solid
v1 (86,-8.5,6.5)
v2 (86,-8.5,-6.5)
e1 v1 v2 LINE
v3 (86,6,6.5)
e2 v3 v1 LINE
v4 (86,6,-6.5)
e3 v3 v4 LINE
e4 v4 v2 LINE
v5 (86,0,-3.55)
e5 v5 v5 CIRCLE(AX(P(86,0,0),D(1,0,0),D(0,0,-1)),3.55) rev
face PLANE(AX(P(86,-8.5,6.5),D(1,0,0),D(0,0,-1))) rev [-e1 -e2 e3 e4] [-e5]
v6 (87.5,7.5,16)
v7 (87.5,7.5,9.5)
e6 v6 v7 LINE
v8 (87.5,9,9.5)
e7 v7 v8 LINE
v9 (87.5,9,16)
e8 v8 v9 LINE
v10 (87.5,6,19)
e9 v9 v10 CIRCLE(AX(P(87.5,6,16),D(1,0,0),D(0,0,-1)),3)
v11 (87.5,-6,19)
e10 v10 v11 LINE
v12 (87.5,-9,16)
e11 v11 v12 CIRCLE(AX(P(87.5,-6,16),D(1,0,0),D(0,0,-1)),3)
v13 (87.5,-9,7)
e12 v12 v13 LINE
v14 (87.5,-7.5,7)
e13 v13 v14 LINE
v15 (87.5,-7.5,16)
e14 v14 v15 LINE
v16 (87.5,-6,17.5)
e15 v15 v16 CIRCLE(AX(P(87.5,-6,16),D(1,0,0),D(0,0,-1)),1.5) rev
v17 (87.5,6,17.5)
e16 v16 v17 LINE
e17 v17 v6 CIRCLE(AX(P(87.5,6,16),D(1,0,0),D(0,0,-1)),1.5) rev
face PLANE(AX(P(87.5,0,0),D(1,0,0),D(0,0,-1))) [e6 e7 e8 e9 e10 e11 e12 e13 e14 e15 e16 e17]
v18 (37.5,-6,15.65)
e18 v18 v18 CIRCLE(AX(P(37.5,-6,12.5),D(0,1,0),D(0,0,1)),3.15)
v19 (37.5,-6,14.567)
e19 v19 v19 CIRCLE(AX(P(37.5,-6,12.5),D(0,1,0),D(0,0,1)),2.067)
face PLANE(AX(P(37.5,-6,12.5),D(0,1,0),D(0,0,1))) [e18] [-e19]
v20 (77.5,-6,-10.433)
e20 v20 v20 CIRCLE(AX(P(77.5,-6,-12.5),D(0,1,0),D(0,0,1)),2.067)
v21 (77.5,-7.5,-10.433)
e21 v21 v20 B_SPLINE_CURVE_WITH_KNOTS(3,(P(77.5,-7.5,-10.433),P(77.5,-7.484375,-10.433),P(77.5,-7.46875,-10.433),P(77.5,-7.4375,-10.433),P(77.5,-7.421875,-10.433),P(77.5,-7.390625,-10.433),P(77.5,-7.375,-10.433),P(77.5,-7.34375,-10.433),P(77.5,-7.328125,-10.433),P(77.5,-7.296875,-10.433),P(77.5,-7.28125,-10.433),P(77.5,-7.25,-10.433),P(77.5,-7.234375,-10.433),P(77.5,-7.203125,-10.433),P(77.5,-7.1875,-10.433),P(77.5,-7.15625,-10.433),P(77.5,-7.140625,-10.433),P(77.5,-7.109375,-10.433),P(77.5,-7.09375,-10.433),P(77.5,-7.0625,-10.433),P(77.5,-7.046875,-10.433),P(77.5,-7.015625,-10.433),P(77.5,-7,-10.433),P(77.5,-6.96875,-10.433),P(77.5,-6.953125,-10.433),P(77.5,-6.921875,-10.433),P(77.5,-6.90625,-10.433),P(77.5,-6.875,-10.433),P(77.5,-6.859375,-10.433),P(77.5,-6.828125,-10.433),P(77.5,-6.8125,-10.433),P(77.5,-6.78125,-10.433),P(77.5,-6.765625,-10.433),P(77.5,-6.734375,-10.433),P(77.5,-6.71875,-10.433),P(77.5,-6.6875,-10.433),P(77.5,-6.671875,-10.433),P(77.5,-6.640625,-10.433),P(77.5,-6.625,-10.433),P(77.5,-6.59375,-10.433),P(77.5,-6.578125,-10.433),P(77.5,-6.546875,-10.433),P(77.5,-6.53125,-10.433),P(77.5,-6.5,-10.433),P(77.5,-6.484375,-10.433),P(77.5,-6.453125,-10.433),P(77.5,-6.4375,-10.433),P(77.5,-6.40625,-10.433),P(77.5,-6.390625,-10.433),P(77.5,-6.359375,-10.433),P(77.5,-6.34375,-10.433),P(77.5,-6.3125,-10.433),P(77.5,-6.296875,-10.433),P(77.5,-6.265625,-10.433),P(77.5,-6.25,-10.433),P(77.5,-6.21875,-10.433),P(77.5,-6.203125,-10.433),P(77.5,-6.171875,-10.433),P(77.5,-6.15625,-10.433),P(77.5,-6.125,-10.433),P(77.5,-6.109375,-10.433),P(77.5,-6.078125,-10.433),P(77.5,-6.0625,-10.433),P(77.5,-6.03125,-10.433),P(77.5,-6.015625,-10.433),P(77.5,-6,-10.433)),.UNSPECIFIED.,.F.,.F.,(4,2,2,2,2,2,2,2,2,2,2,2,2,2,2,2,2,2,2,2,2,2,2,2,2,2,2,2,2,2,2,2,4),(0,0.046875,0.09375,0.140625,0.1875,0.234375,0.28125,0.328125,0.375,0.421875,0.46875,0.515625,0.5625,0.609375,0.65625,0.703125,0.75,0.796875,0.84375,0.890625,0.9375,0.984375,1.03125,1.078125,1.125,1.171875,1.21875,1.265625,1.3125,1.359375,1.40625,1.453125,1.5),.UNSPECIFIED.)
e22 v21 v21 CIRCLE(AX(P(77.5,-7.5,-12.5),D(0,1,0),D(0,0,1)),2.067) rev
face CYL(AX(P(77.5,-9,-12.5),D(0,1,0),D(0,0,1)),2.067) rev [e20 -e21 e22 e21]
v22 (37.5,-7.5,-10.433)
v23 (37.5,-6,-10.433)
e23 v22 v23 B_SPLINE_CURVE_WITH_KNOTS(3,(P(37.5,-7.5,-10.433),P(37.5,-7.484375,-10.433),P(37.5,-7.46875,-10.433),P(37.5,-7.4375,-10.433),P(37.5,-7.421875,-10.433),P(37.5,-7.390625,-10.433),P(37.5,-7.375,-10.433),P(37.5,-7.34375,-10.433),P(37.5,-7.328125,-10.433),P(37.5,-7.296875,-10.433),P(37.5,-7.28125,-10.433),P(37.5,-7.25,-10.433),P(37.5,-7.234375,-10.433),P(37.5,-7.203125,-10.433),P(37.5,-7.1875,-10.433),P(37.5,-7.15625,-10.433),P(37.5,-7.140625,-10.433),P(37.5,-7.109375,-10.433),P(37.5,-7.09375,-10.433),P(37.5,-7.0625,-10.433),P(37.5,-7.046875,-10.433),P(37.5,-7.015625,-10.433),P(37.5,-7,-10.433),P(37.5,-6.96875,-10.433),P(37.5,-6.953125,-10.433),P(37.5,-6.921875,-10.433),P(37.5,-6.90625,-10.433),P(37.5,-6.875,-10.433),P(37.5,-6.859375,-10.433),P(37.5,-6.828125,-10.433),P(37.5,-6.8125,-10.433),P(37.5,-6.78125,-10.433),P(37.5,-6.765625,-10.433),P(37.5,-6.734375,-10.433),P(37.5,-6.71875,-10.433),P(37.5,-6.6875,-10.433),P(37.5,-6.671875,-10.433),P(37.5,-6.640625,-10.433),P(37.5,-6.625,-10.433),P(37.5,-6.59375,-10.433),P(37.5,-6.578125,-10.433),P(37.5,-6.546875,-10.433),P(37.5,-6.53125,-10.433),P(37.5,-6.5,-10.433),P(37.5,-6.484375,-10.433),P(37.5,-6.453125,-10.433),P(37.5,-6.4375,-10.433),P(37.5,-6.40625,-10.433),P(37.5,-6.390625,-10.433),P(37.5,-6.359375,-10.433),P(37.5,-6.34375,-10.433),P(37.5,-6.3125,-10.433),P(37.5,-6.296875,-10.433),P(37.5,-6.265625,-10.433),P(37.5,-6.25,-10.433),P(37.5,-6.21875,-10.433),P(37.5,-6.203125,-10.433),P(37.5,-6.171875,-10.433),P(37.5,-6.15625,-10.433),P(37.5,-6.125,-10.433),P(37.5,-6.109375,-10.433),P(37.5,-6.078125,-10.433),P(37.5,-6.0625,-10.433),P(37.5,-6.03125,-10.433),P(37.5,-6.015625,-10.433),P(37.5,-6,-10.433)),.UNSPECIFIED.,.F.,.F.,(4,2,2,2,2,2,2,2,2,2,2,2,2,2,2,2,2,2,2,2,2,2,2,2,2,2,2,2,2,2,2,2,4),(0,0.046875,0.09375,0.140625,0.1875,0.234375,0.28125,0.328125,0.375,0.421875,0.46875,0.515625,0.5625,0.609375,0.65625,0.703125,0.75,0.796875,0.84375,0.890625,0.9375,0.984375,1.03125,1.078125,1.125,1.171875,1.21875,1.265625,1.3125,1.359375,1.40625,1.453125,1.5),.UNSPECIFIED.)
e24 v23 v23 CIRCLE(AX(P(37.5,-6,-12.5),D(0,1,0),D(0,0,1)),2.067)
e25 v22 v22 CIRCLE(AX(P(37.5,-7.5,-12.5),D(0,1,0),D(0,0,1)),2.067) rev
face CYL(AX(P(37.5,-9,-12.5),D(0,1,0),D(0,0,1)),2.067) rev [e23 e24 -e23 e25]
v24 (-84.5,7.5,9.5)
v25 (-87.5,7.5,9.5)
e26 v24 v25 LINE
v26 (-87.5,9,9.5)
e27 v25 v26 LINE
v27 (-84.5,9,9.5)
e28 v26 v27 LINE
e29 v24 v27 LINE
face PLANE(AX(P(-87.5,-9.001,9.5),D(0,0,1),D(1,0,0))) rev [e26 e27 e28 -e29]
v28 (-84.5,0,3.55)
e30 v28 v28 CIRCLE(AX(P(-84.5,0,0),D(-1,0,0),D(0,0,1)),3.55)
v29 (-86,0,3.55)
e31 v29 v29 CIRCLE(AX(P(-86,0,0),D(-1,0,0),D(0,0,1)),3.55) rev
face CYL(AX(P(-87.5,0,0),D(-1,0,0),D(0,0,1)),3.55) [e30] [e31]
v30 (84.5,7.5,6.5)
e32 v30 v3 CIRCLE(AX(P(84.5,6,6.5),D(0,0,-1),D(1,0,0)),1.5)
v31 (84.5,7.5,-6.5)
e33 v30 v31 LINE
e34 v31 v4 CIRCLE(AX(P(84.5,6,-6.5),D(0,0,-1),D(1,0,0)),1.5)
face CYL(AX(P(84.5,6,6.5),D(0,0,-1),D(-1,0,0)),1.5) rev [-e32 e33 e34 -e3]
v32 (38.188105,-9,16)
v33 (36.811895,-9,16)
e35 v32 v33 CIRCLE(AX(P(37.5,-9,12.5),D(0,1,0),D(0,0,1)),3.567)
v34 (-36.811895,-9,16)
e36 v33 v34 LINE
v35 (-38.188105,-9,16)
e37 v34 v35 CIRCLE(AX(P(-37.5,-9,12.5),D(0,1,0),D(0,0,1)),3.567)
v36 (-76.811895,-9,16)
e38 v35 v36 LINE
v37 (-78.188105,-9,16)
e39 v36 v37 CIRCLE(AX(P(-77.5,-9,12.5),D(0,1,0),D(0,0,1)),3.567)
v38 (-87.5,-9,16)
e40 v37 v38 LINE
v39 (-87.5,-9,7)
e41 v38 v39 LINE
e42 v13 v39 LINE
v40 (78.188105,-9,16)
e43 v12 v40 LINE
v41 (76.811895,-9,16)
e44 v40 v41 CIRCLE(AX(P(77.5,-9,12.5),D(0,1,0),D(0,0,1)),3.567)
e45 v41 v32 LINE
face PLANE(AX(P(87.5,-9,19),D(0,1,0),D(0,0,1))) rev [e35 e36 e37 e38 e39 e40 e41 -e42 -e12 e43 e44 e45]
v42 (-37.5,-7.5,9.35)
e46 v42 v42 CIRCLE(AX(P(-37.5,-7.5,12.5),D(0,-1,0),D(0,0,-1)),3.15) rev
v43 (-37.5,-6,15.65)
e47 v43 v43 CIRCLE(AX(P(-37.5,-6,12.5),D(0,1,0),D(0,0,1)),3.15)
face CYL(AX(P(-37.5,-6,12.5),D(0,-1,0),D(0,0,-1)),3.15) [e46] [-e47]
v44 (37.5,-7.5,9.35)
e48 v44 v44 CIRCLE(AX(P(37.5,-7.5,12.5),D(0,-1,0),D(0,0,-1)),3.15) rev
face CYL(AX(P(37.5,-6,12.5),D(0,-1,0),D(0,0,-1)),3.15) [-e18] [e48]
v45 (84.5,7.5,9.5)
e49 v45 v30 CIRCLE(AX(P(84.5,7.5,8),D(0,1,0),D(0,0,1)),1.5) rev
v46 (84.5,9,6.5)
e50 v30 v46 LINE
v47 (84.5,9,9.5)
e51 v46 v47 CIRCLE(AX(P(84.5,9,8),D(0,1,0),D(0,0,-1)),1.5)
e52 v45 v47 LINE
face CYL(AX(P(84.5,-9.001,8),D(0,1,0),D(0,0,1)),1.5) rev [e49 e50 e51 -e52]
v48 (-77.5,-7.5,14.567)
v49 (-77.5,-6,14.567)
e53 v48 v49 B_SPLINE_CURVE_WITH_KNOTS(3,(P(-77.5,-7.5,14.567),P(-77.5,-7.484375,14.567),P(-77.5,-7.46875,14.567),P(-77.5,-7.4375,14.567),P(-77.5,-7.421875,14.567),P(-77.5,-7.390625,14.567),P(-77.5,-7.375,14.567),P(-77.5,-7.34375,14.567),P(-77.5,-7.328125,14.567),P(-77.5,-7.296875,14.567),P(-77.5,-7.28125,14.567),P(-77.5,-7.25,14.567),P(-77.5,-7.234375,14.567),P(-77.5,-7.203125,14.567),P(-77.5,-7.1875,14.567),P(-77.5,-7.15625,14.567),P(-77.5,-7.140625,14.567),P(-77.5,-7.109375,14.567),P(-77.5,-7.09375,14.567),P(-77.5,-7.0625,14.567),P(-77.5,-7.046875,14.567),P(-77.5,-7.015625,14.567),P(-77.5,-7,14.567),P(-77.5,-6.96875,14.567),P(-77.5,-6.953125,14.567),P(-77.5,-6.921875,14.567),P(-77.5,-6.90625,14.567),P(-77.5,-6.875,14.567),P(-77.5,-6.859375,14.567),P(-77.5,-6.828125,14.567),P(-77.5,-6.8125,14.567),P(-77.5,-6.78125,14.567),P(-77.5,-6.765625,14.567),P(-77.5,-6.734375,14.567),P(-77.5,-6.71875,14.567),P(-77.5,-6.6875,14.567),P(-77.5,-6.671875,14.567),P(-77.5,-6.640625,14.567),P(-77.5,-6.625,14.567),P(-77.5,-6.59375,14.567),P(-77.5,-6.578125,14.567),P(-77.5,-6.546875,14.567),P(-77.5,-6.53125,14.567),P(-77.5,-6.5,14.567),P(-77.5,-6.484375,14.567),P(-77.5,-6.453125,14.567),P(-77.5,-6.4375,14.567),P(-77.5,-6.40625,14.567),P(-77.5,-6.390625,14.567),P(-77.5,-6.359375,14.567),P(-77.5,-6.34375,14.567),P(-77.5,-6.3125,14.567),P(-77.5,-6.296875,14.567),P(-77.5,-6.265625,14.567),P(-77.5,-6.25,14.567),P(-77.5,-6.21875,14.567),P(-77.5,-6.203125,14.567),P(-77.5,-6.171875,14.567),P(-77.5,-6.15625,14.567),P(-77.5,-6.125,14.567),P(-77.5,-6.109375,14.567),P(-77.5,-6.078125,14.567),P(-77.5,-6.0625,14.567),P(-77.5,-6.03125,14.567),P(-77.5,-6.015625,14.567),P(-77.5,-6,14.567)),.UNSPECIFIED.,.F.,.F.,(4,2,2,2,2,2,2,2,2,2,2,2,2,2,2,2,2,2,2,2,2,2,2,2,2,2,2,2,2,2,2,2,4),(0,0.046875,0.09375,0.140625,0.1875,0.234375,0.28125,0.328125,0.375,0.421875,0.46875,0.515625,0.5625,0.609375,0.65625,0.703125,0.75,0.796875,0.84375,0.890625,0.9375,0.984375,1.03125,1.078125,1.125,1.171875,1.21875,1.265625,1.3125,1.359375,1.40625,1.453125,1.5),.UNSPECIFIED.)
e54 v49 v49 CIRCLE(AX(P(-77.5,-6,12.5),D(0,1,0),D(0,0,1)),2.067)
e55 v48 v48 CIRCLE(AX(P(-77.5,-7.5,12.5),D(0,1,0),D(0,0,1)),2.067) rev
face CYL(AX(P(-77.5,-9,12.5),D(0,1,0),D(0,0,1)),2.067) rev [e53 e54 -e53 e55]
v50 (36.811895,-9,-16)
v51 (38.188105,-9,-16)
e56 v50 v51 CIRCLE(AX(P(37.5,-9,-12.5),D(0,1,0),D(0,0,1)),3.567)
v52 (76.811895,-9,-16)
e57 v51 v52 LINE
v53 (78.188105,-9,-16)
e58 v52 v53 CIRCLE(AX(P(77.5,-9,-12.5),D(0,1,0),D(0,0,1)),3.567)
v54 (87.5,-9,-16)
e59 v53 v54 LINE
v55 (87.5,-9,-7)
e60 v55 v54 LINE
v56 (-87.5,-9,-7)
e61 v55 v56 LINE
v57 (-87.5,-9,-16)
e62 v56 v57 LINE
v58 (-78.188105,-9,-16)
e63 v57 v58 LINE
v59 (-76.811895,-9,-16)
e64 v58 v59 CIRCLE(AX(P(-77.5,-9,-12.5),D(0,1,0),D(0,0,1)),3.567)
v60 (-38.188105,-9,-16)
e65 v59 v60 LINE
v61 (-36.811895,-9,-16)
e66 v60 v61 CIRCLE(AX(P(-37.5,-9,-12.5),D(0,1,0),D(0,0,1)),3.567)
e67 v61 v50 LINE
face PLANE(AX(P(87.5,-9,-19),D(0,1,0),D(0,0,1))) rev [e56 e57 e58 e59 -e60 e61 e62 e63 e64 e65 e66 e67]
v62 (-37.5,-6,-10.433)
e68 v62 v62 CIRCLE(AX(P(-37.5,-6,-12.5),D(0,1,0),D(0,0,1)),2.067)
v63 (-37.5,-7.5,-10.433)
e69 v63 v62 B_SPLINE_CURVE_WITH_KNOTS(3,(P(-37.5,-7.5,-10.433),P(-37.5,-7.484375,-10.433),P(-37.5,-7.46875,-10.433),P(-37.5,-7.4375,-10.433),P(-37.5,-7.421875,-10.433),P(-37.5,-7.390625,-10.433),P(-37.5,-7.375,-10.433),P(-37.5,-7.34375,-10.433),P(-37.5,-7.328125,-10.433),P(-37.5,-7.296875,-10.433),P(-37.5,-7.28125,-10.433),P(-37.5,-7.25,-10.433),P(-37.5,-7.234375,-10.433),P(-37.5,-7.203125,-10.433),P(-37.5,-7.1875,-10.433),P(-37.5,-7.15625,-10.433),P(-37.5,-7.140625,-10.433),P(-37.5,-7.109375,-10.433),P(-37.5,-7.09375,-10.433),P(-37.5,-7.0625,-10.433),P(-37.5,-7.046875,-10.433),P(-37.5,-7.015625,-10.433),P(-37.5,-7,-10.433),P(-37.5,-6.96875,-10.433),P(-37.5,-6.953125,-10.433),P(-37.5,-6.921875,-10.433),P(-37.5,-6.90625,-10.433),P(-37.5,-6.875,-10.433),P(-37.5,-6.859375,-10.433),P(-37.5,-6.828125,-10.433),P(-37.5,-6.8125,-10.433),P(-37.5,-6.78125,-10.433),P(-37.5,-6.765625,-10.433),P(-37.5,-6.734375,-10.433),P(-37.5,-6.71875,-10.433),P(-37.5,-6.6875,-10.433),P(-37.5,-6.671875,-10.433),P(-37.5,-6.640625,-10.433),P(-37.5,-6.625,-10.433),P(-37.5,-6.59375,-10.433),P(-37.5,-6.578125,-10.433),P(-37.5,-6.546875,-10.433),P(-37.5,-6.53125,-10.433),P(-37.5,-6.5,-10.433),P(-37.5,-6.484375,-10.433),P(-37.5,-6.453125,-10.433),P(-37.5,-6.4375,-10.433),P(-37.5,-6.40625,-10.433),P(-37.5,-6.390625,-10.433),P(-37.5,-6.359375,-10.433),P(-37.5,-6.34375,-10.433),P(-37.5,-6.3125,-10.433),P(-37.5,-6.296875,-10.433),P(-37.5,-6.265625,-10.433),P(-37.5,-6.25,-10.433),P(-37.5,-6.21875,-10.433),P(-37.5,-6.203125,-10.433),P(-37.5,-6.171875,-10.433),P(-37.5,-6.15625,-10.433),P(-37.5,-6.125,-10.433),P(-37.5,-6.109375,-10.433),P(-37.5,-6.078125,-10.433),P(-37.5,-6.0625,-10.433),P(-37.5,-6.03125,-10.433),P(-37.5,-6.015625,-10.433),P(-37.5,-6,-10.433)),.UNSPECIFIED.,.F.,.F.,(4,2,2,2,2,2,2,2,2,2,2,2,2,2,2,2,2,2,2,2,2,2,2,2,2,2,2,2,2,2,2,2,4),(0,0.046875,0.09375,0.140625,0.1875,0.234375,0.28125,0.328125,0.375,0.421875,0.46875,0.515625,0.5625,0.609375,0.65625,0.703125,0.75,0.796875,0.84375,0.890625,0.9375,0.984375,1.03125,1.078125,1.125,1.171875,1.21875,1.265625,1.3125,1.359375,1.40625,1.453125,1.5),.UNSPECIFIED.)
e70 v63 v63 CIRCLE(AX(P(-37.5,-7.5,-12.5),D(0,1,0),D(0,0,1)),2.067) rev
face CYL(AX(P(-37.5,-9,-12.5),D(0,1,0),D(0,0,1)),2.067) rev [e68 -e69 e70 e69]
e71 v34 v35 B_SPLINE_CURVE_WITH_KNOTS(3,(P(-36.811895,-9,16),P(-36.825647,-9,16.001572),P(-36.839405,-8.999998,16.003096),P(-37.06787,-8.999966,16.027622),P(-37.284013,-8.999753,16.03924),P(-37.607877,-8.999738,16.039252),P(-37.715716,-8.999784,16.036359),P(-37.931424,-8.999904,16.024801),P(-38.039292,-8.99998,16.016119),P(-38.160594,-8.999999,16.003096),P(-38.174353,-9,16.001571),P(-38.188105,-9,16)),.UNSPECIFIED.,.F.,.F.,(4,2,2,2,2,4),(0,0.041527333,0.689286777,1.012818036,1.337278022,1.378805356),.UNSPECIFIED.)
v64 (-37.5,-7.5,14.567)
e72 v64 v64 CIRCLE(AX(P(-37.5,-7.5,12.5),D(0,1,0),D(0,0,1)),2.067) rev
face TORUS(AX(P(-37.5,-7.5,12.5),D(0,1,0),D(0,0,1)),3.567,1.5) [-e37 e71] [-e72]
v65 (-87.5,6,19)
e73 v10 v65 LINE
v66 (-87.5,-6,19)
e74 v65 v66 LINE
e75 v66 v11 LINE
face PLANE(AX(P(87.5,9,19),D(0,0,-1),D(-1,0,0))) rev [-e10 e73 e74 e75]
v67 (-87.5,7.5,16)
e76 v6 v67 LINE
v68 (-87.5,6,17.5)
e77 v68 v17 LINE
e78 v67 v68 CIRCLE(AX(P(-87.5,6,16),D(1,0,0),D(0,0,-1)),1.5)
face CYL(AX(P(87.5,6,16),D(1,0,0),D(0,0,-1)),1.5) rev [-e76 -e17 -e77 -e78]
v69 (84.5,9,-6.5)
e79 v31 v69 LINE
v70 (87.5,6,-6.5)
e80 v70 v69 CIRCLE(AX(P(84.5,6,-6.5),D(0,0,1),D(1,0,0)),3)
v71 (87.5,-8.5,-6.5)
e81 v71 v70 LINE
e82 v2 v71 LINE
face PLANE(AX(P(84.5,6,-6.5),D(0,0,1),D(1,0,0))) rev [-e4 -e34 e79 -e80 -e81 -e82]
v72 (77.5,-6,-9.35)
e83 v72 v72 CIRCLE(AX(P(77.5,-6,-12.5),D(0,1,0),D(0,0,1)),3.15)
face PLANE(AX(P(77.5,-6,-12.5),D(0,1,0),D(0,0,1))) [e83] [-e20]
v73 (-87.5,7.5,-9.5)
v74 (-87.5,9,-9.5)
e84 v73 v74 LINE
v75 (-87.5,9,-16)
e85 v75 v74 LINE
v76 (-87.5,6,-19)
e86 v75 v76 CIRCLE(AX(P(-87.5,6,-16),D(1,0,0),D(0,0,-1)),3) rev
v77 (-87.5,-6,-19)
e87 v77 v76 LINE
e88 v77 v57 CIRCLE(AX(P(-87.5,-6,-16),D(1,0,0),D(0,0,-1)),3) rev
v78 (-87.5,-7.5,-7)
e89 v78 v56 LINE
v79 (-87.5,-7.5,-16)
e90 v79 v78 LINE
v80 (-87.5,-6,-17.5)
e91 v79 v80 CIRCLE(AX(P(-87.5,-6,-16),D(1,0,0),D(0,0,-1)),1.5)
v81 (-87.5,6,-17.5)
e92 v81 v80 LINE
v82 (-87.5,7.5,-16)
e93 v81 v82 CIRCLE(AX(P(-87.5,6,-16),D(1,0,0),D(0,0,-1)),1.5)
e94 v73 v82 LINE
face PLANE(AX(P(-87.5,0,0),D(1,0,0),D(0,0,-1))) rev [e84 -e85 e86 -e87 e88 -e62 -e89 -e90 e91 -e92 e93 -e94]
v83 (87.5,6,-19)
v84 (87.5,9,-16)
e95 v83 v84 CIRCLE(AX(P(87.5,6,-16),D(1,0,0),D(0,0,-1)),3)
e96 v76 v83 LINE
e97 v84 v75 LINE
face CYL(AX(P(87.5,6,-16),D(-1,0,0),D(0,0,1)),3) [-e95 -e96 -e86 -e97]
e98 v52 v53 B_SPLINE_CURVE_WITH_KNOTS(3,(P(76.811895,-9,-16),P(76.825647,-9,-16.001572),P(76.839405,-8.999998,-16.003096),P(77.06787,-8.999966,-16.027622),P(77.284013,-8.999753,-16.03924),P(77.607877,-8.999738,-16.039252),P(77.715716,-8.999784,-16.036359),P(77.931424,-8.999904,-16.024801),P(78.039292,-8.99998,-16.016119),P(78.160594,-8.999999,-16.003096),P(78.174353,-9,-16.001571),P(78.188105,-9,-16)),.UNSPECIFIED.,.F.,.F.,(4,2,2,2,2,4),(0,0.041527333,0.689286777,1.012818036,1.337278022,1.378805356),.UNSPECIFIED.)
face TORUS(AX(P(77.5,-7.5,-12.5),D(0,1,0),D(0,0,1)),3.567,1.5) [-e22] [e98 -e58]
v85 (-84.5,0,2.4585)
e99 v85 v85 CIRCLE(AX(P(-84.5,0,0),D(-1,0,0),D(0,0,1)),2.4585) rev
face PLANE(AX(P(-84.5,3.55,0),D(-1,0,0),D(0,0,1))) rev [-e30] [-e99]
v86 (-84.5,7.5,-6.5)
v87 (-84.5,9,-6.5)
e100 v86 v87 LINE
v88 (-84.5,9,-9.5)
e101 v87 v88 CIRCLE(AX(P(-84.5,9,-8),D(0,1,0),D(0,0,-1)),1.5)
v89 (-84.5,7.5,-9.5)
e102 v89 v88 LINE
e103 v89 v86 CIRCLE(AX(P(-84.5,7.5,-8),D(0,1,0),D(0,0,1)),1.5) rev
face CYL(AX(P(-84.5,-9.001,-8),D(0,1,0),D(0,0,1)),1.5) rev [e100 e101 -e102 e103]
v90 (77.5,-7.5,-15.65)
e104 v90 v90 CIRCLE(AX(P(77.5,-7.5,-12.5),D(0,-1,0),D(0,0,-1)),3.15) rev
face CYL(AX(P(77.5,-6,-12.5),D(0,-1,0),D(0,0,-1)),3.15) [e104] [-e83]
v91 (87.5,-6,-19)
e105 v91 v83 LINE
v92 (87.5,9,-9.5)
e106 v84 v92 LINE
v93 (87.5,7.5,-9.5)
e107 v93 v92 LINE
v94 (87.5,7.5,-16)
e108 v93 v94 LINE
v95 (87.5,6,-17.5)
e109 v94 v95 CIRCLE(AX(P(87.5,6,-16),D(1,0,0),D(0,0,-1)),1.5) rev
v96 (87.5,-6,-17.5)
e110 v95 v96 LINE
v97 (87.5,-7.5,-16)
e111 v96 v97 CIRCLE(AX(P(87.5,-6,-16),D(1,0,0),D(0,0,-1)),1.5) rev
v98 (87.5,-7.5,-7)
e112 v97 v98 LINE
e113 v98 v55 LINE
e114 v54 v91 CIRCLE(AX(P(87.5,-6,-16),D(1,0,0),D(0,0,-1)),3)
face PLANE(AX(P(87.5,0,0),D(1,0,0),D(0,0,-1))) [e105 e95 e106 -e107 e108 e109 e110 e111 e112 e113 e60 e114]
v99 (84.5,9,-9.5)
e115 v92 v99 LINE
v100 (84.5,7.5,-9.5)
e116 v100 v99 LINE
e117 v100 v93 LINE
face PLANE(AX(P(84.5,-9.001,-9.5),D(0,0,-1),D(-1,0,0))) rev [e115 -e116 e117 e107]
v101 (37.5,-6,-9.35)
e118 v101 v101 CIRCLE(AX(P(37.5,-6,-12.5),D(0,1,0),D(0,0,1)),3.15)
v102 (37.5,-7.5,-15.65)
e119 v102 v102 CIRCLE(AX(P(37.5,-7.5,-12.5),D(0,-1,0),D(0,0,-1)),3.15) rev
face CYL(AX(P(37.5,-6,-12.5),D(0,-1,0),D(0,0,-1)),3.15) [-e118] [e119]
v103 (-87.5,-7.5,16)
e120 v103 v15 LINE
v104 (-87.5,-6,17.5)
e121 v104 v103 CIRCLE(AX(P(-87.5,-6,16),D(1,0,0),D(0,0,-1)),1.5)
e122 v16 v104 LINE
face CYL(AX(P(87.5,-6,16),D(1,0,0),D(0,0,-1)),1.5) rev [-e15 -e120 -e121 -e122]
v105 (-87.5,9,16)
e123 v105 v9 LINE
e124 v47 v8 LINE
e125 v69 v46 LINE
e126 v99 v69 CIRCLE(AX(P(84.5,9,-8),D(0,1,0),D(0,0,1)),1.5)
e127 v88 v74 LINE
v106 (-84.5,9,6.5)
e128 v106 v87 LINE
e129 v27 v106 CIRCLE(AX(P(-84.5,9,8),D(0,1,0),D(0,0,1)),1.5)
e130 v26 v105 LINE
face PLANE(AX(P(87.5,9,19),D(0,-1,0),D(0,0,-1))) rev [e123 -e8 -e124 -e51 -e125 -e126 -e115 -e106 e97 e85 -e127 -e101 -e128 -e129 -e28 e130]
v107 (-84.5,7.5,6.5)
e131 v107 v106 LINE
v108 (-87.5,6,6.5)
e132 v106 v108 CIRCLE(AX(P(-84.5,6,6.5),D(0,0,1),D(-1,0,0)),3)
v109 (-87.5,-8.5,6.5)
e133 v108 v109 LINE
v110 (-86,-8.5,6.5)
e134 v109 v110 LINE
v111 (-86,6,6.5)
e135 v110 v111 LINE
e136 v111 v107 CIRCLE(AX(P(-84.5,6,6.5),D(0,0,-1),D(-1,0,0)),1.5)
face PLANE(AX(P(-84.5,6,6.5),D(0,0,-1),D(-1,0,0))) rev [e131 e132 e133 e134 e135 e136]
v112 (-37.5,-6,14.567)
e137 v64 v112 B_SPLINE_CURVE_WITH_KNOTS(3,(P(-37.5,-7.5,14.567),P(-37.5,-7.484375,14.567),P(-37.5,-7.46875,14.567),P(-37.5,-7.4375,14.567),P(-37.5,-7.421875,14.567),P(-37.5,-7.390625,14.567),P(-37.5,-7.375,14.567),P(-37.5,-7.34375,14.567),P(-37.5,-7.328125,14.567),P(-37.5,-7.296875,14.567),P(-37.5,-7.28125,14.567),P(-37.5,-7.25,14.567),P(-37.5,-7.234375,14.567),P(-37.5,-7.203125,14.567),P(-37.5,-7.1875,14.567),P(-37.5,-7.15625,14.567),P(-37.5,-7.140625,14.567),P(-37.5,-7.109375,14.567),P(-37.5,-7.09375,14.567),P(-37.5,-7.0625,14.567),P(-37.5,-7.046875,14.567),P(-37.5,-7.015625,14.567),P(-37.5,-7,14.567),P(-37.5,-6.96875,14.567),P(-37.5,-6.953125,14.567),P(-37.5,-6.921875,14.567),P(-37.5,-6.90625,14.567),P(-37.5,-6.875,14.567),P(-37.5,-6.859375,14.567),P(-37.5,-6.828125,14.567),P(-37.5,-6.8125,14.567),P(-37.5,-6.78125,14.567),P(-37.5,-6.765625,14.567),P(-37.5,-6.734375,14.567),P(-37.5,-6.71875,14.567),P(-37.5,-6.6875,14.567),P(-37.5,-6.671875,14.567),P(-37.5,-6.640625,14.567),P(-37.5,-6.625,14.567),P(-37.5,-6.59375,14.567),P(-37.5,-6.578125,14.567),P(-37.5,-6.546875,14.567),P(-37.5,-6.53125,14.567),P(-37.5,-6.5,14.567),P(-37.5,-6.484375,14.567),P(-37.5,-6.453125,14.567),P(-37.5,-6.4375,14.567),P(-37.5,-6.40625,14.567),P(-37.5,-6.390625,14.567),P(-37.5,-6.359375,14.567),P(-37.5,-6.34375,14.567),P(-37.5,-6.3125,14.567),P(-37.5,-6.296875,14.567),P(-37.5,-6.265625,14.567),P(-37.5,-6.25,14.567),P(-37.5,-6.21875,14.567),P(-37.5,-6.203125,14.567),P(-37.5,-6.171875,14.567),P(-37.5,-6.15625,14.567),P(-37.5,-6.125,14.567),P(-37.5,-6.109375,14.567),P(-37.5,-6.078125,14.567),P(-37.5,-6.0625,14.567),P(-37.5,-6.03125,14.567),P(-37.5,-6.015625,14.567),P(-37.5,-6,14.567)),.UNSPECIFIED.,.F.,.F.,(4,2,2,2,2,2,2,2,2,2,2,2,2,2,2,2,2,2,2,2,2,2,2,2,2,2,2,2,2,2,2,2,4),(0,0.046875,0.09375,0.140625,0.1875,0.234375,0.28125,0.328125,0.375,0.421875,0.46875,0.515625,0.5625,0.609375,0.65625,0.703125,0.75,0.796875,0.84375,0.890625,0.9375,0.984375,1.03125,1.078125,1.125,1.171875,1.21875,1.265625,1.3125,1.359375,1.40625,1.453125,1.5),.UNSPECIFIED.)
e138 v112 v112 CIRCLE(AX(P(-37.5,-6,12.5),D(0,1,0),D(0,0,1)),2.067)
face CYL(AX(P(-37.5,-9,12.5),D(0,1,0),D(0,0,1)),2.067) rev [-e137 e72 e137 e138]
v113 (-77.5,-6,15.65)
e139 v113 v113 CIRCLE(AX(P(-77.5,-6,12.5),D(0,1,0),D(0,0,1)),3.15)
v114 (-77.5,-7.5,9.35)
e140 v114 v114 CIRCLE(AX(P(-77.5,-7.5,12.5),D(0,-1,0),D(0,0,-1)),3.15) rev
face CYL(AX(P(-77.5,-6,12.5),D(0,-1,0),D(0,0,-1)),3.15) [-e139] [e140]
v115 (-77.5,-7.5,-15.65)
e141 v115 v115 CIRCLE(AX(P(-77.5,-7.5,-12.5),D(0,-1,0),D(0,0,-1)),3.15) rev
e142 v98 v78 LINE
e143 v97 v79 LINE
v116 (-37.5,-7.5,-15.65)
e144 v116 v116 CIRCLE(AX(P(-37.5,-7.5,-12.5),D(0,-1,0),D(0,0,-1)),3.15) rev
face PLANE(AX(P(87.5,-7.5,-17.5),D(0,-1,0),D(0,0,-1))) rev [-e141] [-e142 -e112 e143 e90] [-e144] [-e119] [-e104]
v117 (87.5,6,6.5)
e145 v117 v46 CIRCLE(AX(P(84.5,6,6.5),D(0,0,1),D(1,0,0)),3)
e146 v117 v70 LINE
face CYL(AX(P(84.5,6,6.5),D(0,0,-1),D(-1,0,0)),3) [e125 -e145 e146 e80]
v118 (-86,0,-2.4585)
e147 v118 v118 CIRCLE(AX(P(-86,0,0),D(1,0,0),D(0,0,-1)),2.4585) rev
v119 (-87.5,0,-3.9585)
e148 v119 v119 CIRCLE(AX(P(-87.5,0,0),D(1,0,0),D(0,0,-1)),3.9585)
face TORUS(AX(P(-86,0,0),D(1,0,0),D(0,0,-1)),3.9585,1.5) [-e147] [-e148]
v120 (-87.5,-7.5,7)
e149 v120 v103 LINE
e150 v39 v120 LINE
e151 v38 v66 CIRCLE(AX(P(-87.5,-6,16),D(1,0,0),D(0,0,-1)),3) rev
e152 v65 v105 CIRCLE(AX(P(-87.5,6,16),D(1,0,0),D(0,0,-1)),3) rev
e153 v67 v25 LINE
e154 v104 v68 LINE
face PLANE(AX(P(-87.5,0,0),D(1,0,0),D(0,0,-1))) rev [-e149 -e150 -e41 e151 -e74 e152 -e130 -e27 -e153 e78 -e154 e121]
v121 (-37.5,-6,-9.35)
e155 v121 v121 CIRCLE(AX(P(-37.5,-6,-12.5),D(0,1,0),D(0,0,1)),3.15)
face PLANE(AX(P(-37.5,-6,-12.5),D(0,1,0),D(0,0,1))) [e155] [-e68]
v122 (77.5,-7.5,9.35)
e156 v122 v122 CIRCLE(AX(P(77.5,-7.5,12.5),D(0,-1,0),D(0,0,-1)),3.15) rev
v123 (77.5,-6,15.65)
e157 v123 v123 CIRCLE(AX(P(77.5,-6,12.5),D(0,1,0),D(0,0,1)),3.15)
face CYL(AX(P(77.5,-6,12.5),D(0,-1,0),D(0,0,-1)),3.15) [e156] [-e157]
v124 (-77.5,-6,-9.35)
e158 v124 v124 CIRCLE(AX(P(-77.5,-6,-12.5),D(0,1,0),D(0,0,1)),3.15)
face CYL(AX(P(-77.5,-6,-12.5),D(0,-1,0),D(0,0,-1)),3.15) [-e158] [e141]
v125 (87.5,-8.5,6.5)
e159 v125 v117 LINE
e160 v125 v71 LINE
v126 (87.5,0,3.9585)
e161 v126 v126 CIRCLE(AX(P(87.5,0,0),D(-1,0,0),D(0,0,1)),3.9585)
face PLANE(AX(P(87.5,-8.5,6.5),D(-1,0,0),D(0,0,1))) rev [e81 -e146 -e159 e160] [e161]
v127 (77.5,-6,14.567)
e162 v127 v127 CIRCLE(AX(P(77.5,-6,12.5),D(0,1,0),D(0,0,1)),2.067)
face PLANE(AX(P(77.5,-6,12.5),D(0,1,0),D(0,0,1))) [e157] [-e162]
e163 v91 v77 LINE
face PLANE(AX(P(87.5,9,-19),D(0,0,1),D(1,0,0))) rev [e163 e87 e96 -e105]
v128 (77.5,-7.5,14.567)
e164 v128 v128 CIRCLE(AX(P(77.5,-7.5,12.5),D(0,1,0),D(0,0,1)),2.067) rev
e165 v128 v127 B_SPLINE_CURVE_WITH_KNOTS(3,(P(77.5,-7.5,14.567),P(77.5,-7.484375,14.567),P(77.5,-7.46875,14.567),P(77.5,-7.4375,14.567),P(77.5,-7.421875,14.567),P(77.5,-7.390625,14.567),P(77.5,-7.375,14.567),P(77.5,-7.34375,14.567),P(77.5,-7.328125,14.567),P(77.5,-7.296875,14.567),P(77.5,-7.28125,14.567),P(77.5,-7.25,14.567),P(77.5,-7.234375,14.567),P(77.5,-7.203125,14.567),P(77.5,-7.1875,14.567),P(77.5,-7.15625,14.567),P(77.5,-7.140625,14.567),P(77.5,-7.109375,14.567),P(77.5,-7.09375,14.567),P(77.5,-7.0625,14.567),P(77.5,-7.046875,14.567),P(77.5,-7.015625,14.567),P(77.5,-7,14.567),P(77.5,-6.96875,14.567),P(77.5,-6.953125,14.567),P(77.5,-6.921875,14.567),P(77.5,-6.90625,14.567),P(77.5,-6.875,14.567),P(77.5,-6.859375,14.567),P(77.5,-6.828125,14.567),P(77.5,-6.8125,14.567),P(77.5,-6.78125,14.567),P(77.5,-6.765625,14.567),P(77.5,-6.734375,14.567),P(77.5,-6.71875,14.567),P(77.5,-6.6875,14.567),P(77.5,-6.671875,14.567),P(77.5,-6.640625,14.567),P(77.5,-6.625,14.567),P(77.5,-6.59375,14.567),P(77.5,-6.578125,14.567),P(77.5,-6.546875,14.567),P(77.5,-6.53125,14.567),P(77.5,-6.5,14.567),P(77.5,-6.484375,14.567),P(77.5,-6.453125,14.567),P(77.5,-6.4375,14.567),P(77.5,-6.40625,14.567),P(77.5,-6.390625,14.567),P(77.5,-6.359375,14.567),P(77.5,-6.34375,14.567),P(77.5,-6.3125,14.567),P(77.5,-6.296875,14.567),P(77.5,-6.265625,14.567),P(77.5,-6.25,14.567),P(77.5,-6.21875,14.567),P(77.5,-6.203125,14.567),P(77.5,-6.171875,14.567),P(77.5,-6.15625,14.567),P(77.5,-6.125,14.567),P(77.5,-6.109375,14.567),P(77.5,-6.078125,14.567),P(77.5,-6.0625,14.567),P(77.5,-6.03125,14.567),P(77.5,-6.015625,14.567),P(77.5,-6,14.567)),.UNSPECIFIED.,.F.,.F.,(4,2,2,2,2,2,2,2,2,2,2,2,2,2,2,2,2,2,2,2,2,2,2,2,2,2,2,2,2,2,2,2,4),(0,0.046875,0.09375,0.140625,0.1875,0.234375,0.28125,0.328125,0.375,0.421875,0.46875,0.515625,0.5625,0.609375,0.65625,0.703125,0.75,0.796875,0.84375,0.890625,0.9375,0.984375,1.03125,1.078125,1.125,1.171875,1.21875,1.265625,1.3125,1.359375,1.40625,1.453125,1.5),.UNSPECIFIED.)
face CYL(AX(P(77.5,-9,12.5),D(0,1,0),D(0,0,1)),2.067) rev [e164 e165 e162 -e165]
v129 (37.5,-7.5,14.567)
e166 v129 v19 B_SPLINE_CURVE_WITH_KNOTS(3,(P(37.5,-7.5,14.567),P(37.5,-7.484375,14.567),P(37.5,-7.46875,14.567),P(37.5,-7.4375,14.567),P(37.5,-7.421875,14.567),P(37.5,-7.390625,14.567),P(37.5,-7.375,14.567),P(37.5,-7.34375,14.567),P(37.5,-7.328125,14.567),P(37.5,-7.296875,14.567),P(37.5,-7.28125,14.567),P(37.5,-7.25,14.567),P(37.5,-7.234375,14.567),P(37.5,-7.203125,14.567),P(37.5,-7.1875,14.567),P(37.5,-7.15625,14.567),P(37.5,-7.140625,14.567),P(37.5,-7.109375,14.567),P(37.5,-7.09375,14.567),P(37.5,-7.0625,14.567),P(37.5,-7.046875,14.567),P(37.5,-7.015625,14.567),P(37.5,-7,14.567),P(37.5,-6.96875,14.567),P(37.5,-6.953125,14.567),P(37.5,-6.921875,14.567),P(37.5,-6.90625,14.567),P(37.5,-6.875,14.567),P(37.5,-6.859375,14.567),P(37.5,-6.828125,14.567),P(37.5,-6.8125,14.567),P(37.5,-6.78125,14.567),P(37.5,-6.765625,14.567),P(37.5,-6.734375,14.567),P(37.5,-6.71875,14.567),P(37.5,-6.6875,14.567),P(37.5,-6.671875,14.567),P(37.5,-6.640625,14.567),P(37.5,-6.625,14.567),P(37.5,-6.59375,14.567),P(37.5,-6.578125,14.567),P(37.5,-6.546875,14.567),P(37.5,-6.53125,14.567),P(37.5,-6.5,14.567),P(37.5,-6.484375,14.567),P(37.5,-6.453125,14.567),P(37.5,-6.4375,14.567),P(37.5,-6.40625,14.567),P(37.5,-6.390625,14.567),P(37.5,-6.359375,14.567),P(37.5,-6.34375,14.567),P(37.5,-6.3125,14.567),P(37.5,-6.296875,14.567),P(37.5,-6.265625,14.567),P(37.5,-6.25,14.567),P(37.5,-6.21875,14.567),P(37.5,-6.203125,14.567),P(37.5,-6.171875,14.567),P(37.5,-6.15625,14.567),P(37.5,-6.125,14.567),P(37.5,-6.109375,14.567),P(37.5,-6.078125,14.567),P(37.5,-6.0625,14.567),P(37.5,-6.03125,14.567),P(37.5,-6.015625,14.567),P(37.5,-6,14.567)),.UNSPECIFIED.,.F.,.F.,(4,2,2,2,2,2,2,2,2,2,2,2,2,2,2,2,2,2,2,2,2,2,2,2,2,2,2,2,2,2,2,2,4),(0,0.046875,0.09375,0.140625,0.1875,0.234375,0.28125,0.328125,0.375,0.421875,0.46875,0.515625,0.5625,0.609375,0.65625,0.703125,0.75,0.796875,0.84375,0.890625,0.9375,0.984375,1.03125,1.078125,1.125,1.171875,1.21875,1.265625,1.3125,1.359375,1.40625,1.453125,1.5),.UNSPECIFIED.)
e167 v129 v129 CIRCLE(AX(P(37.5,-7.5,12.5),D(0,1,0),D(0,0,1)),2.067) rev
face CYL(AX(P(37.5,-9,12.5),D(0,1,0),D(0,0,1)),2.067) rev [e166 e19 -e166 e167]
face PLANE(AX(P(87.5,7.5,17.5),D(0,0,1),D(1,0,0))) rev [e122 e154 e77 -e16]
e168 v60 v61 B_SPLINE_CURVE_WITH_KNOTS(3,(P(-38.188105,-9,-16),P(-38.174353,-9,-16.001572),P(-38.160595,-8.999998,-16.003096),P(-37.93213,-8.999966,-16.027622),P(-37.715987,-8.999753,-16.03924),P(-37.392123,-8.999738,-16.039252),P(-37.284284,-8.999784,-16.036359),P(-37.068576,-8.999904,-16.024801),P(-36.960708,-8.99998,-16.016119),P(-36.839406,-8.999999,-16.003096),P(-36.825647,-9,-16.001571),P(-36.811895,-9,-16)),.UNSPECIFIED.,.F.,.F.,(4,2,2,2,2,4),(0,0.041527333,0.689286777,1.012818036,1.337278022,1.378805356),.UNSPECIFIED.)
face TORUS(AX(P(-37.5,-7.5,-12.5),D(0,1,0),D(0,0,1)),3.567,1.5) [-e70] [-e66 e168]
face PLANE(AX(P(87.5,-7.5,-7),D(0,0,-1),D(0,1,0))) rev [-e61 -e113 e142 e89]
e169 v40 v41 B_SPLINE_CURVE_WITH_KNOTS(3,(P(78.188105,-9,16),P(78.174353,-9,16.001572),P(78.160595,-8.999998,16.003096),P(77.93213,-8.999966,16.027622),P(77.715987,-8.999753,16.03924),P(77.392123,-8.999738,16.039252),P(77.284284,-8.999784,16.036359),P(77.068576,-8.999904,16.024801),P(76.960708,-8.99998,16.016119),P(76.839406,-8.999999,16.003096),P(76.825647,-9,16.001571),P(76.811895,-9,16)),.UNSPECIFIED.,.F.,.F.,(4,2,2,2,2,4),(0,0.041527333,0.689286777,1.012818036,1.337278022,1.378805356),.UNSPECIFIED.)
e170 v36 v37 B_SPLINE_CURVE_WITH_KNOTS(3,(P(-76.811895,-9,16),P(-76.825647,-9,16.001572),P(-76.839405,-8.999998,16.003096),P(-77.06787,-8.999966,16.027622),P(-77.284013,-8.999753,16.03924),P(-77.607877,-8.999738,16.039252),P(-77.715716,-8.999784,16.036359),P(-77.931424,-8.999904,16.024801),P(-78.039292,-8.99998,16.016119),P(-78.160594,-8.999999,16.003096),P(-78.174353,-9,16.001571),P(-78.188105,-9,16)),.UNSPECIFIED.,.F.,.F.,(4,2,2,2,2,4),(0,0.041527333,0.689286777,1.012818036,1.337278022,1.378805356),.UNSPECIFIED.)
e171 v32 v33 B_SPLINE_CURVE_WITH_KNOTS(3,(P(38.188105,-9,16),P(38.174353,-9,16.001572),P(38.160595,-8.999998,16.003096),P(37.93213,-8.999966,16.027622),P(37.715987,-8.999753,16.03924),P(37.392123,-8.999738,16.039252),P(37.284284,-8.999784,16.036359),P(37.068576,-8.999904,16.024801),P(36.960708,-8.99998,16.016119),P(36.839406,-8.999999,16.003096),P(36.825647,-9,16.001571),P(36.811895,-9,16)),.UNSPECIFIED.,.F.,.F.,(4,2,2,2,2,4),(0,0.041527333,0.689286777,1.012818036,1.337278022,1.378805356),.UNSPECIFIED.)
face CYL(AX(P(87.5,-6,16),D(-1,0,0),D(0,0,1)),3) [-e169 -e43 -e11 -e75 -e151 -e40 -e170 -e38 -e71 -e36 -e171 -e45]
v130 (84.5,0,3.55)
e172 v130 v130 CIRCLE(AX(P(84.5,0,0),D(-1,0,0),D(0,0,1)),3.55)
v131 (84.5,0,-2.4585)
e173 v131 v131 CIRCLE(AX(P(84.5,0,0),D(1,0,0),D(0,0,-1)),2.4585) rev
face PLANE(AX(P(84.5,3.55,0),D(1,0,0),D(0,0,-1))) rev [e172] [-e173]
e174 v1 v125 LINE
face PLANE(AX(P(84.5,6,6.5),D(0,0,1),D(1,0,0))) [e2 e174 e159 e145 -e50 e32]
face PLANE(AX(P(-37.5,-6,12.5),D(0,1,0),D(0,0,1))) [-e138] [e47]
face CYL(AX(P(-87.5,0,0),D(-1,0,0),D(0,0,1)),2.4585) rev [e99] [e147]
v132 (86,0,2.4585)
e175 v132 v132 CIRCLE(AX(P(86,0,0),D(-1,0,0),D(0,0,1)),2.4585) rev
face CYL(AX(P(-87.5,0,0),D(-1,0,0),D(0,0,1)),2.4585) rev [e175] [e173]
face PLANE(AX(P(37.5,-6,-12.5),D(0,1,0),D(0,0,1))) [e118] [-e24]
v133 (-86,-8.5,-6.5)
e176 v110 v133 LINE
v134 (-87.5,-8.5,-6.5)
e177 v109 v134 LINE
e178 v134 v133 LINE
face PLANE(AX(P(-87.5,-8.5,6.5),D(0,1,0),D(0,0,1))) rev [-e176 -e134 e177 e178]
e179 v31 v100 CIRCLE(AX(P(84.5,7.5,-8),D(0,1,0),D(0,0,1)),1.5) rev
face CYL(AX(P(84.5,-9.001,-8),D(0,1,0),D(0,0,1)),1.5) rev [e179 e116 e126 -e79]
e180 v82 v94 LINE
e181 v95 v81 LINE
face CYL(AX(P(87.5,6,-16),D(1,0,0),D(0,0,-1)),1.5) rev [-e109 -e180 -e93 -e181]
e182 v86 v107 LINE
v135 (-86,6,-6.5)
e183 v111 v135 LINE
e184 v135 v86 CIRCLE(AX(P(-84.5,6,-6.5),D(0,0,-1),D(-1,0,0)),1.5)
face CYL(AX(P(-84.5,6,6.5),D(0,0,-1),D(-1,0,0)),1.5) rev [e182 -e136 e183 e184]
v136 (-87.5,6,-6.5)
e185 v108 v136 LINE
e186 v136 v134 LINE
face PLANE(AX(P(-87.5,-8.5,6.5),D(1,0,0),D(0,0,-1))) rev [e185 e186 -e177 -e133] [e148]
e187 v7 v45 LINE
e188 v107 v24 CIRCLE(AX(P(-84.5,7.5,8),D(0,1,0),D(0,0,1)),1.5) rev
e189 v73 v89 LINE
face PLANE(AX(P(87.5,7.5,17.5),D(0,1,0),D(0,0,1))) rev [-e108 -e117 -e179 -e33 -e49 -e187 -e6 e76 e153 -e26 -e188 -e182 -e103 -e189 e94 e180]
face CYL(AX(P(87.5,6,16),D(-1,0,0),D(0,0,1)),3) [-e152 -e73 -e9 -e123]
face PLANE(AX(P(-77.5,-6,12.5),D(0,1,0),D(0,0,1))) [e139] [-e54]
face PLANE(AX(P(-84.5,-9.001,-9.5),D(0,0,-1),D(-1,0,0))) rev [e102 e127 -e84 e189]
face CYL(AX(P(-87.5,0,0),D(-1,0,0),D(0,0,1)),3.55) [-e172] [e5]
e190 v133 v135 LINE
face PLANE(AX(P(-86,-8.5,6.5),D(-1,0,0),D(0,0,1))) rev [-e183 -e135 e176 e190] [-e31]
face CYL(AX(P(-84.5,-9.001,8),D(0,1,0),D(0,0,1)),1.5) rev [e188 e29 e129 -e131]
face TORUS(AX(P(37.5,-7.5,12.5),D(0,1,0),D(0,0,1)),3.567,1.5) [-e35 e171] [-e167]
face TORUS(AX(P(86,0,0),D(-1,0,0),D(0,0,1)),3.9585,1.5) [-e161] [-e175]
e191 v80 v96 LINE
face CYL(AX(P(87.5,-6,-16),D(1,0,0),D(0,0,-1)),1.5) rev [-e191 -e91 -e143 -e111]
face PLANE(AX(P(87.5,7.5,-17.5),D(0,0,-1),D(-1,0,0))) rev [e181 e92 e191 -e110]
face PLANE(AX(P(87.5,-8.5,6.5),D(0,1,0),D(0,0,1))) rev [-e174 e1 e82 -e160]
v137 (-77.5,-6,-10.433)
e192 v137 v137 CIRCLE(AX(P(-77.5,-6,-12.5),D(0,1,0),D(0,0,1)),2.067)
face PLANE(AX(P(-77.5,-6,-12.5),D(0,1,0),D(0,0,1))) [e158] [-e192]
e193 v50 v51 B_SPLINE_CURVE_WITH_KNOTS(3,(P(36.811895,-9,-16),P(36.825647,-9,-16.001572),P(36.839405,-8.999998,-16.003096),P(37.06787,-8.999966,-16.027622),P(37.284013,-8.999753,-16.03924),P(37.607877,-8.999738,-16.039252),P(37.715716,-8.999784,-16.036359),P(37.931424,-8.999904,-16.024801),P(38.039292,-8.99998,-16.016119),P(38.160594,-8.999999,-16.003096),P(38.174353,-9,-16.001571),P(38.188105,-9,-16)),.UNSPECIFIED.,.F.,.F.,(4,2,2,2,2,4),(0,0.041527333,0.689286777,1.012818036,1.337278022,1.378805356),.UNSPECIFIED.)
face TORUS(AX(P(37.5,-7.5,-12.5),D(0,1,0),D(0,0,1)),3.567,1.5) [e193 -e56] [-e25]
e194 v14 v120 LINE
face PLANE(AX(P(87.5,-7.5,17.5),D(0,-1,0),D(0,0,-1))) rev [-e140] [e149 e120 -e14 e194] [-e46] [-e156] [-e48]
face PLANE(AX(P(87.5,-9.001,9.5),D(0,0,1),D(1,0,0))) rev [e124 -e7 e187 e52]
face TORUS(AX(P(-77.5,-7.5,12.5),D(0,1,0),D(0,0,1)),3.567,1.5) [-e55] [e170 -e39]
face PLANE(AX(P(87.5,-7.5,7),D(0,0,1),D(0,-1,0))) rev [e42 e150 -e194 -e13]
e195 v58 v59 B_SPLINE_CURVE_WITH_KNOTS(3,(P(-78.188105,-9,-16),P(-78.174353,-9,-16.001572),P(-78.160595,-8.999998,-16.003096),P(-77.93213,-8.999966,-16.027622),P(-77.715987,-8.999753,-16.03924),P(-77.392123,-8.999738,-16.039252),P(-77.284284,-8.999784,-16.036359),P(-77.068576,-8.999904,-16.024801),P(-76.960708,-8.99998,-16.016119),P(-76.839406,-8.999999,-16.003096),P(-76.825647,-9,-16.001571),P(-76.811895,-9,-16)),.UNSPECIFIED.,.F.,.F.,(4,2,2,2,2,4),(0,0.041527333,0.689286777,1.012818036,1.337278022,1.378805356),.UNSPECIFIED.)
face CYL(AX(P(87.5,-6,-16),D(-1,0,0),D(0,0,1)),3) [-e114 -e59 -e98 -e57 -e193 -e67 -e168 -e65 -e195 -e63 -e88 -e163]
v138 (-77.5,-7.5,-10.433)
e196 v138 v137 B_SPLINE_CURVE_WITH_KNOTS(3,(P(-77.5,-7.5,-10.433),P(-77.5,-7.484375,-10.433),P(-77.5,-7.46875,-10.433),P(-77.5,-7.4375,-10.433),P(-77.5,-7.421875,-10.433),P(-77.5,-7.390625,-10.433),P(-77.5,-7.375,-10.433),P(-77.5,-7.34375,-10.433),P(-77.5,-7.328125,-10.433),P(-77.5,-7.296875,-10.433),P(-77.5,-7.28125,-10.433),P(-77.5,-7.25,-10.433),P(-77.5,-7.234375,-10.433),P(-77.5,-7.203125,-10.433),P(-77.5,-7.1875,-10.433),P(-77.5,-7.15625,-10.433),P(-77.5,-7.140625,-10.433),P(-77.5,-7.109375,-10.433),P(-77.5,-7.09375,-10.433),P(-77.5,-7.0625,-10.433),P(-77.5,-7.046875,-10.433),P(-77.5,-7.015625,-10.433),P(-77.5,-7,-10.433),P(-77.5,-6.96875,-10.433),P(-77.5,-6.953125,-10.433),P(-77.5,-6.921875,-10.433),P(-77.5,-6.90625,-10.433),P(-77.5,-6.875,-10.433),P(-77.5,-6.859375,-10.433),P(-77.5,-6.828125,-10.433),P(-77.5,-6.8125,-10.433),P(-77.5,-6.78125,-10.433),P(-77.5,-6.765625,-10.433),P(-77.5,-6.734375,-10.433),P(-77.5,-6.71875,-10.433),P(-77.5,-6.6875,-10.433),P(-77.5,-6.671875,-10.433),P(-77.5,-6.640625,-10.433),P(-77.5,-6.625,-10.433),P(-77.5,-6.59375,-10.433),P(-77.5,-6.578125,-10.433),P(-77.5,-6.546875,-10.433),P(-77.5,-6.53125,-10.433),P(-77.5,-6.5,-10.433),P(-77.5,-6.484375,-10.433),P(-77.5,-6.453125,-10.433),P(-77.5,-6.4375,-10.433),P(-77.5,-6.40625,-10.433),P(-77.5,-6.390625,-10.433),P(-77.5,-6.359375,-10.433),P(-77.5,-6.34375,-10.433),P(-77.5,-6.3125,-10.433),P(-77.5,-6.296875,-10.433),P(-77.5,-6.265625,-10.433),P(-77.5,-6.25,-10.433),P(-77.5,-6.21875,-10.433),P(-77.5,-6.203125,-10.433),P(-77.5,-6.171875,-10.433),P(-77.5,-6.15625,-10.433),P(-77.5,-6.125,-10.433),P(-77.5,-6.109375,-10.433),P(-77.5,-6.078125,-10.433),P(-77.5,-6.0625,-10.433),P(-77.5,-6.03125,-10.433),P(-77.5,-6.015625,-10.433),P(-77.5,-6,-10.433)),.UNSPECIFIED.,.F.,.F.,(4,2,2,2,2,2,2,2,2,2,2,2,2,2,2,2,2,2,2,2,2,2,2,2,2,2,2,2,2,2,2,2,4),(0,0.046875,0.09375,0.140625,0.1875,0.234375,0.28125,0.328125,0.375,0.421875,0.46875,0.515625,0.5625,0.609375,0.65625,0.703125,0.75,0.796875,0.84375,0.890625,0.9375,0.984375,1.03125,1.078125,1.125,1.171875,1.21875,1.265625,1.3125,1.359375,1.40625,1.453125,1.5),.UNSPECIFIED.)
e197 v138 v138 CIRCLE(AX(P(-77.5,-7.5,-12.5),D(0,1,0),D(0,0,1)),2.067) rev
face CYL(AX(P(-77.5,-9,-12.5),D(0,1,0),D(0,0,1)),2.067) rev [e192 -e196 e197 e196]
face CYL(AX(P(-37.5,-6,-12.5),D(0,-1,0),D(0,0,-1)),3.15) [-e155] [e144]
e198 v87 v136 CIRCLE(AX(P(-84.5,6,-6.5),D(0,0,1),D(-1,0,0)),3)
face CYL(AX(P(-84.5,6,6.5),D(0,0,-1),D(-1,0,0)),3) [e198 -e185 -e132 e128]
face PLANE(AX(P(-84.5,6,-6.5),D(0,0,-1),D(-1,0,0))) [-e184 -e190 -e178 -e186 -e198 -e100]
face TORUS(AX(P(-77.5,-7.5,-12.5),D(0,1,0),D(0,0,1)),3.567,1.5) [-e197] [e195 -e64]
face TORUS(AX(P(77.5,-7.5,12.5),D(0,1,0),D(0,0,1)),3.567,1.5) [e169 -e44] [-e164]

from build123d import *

# Parameters (mm, degrees)
BOSS_EXTRUDE1_DEPTH = 87.5
CUT_EXTRUDE1_REACH  = 93.33
BOSS_EXTRUDE2_DEPTH = 6.5
SKETCH4_W           = 3
SKETCH4_H           = 3.55
SKETCH5_W           = 175
SKETCH5_H           = 2.4585
FILLET1_R           = 1.5
SKETCH8_R           = 3.15
BOSS_EXTRUDE4_DEPTH = 1.5
SKETCH9_R           = 2.067
CUT_EXTRUDE3_DEPTH  = 91.786838253
FILLET3_R           = 1.5
FILLET4_R           = 3
FILLET5_R           = 1.5


with BuildPart() as part:
    # Sketch1 → Boss-Extrude1 (new, symmetric)
    with BuildSketch(Plane(origin=(0, 0, 0), x_dir=(0, 0, -1), z_dir=(1, 0, 0))):
        Polygon((-19, -9), (-7, -9), (-7, -7.5), (-17.5, -7.5), (-17.5, 7.5), (17.5, 7.5), (17.5, -7.5), (7, -7.5), (7, -9), (19, -9), (19, 9), (-19, 9), align=None)
    extrude(amount=BOSS_EXTRUDE1_DEPTH, both=True)

    # Sketch2 → Cut-Extrude1 (cut, up to next)
    with BuildSketch(Plane(origin=(0, 9, 0), x_dir=(1, 0, 0), z_dir=(0, 1, 0)), mode=Mode.PRIVATE) as cut_extrude1_sk1:
        with BuildLine():
            Line((84.5, 9.5), (87.5, 9.5))
            Line((87.5, 9.5), (87.5, -9.5))
            Line((87.5, -9.5), (84.5, -9.5))
            ThreePointArc((84.5, -9.5), (83, -8), (84.5, -6.5))
            Line((84.5, -6.5), (84.5, 6.5))
            ThreePointArc((84.5, 6.5), (83, 8), (84.5, 9.5))
        make_face()
    cut_extrude1_tool1 = extrude(cut_extrude1_sk1.sketch, amount=-CUT_EXTRUDE1_REACH, mode=Mode.PRIVATE) & part.part
    # Sketch2 → Cut-Extrude1 (cut, up to next)
    with BuildSketch(Plane(origin=(0, 9, 0), x_dir=(1, 0, 0), z_dir=(0, 1, 0)), mode=Mode.PRIVATE) as cut_extrude1_sk2:
        with BuildLine():
            Line((-84.5, 9.5), (-87.5, 9.5))
            Line((-87.5, 9.5), (-87.5, -9.5))
            Line((-87.5, -9.5), (-84.5, -9.5))
            ThreePointArc((-84.5, -9.5), (-83, -8), (-84.5, -6.5))
            Line((-84.5, -6.5), (-84.5, 6.5))
            ThreePointArc((-84.5, 6.5), (-83, 8), (-84.5, 9.5))
        make_face()
    cut_extrude1_tool2 = extrude(cut_extrude1_sk2.sketch, amount=-CUT_EXTRUDE1_REACH, mode=Mode.PRIVATE) & part.part
    add(cut_extrude1_tool1.solids().sort_by_distance((85.76427, 9, 0))[0], mode=Mode.SUBTRACT)
    add(cut_extrude1_tool2.solids().sort_by_distance((-85.76427, 9, 0))[0], mode=Mode.SUBTRACT)

    # Sketch3 → Boss-Extrude2 (add, symmetric)
    with BuildSketch(Plane.XY):
        with BuildLine():
            Line((87.5, -8.5), (87.5, 6))
            ThreePointArc((87.5, 6), (86.621320344, 8.121320344), (84.5, 9))
            Line((84.5, 9), (84.5, 7.5))
            ThreePointArc((84.5, 7.5), (85.560660172, 7.060660172), (86, 6))
            Line((86, 6), (86, -8.5))
            Line((86, -8.5), (87.5, -8.5))
        make_face()
        with BuildLine():
            Line((-87.5, -8.5), (-87.5, 6))
            ThreePointArc((-87.5, 6), (-86.621320344, 8.121320344), (-84.5, 9))
            Line((-84.5, 9), (-84.5, 7.5))
            ThreePointArc((-84.5, 7.5), (-85.560660172, 7.060660172), (-86, 6))
            Line((-86, 6), (-86, -8.5))
            Line((-86, -8.5), (-87.5, -8.5))
        make_face()
    extrude(amount=BOSS_EXTRUDE2_DEPTH, both=True)

    # Sketch4 → Revolve1 (revolve)
    with BuildSketch(Plane.XY, mode=Mode.PRIVATE) as revolve1_sk:
        with Locations((-86, 1.775)):
            Rectangle(SKETCH4_W, SKETCH4_H)
        with Locations((86, 1.775)):
            Rectangle(SKETCH4_W, SKETCH4_H)
    revolve(revolve1_sk.sketch.rotate(Axis((-87.5, 0, 0), (1, 0, 0)), 90), axis=Axis((-87.5, 0, 0), (1, 0, 0)))

    # Sketch5 → Cut-Revolve1 (revolve, cut)
    with BuildSketch(Plane.XY, mode=Mode.PRIVATE) as cut_revolve1_sk:
        with Locations((0, 1.22925)):
            Rectangle(SKETCH5_W, SKETCH5_H)
    revolve(cut_revolve1_sk.sketch.rotate(Axis((-87.5, 0, 0), (1, 0, 0)), 90), axis=Axis((-87.5, 0, 0), (1, 0, 0)), mode=Mode.SUBTRACT)

    # Fillet1
    fillet1_edges = [part.edges().sort_by_distance(p)[0] for p in [
        (87.5, 0, -2.4585),
        (-87.5, 0, -2.4585),
    ]]
    fillet(fillet1_edges, radius=FILLET1_R)

    # Sketch8 → Boss-Extrude4 (add)
    with BuildSketch(Plane(origin=(0, -7.5, 0), x_dir=(1, 0, 0), z_dir=(0, 1, 0))):
        with Locations(Location((-77.5, 12.5, 0), (0, 0, 90))):
            Circle(SKETCH8_R)
        with Locations(Location((-37.5, 12.5, 0), (0, 0, 90))):
            Circle(SKETCH8_R)
        with Locations(Location((-77.5, -12.5, 0), (0, 0, 90))):
            Circle(SKETCH8_R)
        with Locations(Location((-37.5, -12.5, 0), (0, 0, 90))):
            Circle(SKETCH8_R)
        with Locations(Location((37.5, 12.5, 0), (0, 0, 90))):
            Circle(SKETCH8_R)
        with Locations(Location((37.5, -12.5, 0), (0, 0, 90))):
            Circle(SKETCH8_R)
        with Locations(Location((77.5, -12.5, 0), (0, 0, 90))):
            Circle(SKETCH8_R)
        with Locations(Location((77.5, 12.5, 0), (0, 0, 90))):
            Circle(SKETCH8_R)
    extrude(amount=BOSS_EXTRUDE4_DEPTH)

    # Sketch9 → Cut-Extrude3 (cut, through all)
    with BuildSketch(Plane(origin=(0, -6, 0), x_dir=(1, 0, 0), z_dir=(0, 1, 0))):
        with Locations(Location((-77.5, 12.5, 0), (0, 0, 270))):
            Circle(SKETCH9_R)
        with Locations(Location((-77.5, -12.5, 0), (0, 0, 270))):
            Circle(SKETCH9_R)
        with Locations(Location((-37.5, 12.5, 0), (0, 0, 270))):
            Circle(SKETCH9_R)
        with Locations(Location((-37.5, -12.5, 0), (0, 0, 270))):
            Circle(SKETCH9_R)
        with Locations(Location((37.5, 12.5, 0), (0, 0, 270))):
            Circle(SKETCH9_R)
        with Locations(Location((37.5, -12.5, 0), (0, 0, 270))):
            Circle(SKETCH9_R)
        with Locations(Location((77.5, -12.5, 0), (0, 0, 270))):
            Circle(SKETCH9_R)
        with Locations(Location((77.5, 12.5, 0), (0, 0, 270))):
            Circle(SKETCH9_R)
    extrude(amount=-CUT_EXTRUDE3_DEPTH, mode=Mode.SUBTRACT)

    # Fillet3
    fillet3_edges = [part.edges().sort_by_distance(p)[0] for p in [
        (-77.5, -9, -14.567),
        (-77.5, -9, 10.433),
        (-37.5, -9, -14.567),
        (-37.5, -9, 10.433),
        (37.5, -9, -14.567),
        (37.5, -9, 10.433),
        (77.5, -9, 10.433),
        (77.5, -9, -14.567),
    ]]
    fillet(fillet3_edges, radius=FILLET3_R)

    # Fillet4
    # the kernel refuses this fillet: 3 mm, written as the material it takes off along each edge
    with BuildSketch(Plane(origin=(95, -9, 19), x_dir=(0, 1, 0), z_dir=(-1, 0, 0)), Plane(origin=(95, 9, 19), x_dir=(0, 0, -1), z_dir=(-1, 0, 0)), Plane(origin=(95, 9, -19), x_dir=(0, -1, 0), z_dir=(-1, 0, 0))) as fillet4_piece_1:
        with BuildLine():
            CenterArc((FILLET4_R, FILLET4_R), FILLET4_R, 180, 90)
            Line((0, FILLET4_R), (0, 0))
            Line((0, 0), (FILLET4_R, 0))
        make_face()
    extrude(amount=190, mode=Mode.SUBTRACT)
    with BuildSketch(Plane(origin=(-95, -9, -19), x_dir=(0, 0, 1), z_dir=(1, 0, 0))) as fillet4_piece_2:
        with BuildLine():
            CenterArc((FILLET4_R, -FILLET4_R), FILLET4_R, 90, 90)
            Line((0, -FILLET4_R), (0, 0))
            Line((0, 0), (FILLET4_R, 0))
        make_face()
    extrude(amount=190, mode=Mode.SUBTRACT)

    # Fillet5
    fillet5_edges = [part.edges().sort_by_distance(p)[0] for p in [
        (0, -7.5, -17.5),
        (0, 7.5, -17.5),
        (0, 7.5, 17.5),
        (0, -7.5, 17.5),
    ]]
    fillet(fillet5_edges, radius=FILLET5_R)


solid = part.part
